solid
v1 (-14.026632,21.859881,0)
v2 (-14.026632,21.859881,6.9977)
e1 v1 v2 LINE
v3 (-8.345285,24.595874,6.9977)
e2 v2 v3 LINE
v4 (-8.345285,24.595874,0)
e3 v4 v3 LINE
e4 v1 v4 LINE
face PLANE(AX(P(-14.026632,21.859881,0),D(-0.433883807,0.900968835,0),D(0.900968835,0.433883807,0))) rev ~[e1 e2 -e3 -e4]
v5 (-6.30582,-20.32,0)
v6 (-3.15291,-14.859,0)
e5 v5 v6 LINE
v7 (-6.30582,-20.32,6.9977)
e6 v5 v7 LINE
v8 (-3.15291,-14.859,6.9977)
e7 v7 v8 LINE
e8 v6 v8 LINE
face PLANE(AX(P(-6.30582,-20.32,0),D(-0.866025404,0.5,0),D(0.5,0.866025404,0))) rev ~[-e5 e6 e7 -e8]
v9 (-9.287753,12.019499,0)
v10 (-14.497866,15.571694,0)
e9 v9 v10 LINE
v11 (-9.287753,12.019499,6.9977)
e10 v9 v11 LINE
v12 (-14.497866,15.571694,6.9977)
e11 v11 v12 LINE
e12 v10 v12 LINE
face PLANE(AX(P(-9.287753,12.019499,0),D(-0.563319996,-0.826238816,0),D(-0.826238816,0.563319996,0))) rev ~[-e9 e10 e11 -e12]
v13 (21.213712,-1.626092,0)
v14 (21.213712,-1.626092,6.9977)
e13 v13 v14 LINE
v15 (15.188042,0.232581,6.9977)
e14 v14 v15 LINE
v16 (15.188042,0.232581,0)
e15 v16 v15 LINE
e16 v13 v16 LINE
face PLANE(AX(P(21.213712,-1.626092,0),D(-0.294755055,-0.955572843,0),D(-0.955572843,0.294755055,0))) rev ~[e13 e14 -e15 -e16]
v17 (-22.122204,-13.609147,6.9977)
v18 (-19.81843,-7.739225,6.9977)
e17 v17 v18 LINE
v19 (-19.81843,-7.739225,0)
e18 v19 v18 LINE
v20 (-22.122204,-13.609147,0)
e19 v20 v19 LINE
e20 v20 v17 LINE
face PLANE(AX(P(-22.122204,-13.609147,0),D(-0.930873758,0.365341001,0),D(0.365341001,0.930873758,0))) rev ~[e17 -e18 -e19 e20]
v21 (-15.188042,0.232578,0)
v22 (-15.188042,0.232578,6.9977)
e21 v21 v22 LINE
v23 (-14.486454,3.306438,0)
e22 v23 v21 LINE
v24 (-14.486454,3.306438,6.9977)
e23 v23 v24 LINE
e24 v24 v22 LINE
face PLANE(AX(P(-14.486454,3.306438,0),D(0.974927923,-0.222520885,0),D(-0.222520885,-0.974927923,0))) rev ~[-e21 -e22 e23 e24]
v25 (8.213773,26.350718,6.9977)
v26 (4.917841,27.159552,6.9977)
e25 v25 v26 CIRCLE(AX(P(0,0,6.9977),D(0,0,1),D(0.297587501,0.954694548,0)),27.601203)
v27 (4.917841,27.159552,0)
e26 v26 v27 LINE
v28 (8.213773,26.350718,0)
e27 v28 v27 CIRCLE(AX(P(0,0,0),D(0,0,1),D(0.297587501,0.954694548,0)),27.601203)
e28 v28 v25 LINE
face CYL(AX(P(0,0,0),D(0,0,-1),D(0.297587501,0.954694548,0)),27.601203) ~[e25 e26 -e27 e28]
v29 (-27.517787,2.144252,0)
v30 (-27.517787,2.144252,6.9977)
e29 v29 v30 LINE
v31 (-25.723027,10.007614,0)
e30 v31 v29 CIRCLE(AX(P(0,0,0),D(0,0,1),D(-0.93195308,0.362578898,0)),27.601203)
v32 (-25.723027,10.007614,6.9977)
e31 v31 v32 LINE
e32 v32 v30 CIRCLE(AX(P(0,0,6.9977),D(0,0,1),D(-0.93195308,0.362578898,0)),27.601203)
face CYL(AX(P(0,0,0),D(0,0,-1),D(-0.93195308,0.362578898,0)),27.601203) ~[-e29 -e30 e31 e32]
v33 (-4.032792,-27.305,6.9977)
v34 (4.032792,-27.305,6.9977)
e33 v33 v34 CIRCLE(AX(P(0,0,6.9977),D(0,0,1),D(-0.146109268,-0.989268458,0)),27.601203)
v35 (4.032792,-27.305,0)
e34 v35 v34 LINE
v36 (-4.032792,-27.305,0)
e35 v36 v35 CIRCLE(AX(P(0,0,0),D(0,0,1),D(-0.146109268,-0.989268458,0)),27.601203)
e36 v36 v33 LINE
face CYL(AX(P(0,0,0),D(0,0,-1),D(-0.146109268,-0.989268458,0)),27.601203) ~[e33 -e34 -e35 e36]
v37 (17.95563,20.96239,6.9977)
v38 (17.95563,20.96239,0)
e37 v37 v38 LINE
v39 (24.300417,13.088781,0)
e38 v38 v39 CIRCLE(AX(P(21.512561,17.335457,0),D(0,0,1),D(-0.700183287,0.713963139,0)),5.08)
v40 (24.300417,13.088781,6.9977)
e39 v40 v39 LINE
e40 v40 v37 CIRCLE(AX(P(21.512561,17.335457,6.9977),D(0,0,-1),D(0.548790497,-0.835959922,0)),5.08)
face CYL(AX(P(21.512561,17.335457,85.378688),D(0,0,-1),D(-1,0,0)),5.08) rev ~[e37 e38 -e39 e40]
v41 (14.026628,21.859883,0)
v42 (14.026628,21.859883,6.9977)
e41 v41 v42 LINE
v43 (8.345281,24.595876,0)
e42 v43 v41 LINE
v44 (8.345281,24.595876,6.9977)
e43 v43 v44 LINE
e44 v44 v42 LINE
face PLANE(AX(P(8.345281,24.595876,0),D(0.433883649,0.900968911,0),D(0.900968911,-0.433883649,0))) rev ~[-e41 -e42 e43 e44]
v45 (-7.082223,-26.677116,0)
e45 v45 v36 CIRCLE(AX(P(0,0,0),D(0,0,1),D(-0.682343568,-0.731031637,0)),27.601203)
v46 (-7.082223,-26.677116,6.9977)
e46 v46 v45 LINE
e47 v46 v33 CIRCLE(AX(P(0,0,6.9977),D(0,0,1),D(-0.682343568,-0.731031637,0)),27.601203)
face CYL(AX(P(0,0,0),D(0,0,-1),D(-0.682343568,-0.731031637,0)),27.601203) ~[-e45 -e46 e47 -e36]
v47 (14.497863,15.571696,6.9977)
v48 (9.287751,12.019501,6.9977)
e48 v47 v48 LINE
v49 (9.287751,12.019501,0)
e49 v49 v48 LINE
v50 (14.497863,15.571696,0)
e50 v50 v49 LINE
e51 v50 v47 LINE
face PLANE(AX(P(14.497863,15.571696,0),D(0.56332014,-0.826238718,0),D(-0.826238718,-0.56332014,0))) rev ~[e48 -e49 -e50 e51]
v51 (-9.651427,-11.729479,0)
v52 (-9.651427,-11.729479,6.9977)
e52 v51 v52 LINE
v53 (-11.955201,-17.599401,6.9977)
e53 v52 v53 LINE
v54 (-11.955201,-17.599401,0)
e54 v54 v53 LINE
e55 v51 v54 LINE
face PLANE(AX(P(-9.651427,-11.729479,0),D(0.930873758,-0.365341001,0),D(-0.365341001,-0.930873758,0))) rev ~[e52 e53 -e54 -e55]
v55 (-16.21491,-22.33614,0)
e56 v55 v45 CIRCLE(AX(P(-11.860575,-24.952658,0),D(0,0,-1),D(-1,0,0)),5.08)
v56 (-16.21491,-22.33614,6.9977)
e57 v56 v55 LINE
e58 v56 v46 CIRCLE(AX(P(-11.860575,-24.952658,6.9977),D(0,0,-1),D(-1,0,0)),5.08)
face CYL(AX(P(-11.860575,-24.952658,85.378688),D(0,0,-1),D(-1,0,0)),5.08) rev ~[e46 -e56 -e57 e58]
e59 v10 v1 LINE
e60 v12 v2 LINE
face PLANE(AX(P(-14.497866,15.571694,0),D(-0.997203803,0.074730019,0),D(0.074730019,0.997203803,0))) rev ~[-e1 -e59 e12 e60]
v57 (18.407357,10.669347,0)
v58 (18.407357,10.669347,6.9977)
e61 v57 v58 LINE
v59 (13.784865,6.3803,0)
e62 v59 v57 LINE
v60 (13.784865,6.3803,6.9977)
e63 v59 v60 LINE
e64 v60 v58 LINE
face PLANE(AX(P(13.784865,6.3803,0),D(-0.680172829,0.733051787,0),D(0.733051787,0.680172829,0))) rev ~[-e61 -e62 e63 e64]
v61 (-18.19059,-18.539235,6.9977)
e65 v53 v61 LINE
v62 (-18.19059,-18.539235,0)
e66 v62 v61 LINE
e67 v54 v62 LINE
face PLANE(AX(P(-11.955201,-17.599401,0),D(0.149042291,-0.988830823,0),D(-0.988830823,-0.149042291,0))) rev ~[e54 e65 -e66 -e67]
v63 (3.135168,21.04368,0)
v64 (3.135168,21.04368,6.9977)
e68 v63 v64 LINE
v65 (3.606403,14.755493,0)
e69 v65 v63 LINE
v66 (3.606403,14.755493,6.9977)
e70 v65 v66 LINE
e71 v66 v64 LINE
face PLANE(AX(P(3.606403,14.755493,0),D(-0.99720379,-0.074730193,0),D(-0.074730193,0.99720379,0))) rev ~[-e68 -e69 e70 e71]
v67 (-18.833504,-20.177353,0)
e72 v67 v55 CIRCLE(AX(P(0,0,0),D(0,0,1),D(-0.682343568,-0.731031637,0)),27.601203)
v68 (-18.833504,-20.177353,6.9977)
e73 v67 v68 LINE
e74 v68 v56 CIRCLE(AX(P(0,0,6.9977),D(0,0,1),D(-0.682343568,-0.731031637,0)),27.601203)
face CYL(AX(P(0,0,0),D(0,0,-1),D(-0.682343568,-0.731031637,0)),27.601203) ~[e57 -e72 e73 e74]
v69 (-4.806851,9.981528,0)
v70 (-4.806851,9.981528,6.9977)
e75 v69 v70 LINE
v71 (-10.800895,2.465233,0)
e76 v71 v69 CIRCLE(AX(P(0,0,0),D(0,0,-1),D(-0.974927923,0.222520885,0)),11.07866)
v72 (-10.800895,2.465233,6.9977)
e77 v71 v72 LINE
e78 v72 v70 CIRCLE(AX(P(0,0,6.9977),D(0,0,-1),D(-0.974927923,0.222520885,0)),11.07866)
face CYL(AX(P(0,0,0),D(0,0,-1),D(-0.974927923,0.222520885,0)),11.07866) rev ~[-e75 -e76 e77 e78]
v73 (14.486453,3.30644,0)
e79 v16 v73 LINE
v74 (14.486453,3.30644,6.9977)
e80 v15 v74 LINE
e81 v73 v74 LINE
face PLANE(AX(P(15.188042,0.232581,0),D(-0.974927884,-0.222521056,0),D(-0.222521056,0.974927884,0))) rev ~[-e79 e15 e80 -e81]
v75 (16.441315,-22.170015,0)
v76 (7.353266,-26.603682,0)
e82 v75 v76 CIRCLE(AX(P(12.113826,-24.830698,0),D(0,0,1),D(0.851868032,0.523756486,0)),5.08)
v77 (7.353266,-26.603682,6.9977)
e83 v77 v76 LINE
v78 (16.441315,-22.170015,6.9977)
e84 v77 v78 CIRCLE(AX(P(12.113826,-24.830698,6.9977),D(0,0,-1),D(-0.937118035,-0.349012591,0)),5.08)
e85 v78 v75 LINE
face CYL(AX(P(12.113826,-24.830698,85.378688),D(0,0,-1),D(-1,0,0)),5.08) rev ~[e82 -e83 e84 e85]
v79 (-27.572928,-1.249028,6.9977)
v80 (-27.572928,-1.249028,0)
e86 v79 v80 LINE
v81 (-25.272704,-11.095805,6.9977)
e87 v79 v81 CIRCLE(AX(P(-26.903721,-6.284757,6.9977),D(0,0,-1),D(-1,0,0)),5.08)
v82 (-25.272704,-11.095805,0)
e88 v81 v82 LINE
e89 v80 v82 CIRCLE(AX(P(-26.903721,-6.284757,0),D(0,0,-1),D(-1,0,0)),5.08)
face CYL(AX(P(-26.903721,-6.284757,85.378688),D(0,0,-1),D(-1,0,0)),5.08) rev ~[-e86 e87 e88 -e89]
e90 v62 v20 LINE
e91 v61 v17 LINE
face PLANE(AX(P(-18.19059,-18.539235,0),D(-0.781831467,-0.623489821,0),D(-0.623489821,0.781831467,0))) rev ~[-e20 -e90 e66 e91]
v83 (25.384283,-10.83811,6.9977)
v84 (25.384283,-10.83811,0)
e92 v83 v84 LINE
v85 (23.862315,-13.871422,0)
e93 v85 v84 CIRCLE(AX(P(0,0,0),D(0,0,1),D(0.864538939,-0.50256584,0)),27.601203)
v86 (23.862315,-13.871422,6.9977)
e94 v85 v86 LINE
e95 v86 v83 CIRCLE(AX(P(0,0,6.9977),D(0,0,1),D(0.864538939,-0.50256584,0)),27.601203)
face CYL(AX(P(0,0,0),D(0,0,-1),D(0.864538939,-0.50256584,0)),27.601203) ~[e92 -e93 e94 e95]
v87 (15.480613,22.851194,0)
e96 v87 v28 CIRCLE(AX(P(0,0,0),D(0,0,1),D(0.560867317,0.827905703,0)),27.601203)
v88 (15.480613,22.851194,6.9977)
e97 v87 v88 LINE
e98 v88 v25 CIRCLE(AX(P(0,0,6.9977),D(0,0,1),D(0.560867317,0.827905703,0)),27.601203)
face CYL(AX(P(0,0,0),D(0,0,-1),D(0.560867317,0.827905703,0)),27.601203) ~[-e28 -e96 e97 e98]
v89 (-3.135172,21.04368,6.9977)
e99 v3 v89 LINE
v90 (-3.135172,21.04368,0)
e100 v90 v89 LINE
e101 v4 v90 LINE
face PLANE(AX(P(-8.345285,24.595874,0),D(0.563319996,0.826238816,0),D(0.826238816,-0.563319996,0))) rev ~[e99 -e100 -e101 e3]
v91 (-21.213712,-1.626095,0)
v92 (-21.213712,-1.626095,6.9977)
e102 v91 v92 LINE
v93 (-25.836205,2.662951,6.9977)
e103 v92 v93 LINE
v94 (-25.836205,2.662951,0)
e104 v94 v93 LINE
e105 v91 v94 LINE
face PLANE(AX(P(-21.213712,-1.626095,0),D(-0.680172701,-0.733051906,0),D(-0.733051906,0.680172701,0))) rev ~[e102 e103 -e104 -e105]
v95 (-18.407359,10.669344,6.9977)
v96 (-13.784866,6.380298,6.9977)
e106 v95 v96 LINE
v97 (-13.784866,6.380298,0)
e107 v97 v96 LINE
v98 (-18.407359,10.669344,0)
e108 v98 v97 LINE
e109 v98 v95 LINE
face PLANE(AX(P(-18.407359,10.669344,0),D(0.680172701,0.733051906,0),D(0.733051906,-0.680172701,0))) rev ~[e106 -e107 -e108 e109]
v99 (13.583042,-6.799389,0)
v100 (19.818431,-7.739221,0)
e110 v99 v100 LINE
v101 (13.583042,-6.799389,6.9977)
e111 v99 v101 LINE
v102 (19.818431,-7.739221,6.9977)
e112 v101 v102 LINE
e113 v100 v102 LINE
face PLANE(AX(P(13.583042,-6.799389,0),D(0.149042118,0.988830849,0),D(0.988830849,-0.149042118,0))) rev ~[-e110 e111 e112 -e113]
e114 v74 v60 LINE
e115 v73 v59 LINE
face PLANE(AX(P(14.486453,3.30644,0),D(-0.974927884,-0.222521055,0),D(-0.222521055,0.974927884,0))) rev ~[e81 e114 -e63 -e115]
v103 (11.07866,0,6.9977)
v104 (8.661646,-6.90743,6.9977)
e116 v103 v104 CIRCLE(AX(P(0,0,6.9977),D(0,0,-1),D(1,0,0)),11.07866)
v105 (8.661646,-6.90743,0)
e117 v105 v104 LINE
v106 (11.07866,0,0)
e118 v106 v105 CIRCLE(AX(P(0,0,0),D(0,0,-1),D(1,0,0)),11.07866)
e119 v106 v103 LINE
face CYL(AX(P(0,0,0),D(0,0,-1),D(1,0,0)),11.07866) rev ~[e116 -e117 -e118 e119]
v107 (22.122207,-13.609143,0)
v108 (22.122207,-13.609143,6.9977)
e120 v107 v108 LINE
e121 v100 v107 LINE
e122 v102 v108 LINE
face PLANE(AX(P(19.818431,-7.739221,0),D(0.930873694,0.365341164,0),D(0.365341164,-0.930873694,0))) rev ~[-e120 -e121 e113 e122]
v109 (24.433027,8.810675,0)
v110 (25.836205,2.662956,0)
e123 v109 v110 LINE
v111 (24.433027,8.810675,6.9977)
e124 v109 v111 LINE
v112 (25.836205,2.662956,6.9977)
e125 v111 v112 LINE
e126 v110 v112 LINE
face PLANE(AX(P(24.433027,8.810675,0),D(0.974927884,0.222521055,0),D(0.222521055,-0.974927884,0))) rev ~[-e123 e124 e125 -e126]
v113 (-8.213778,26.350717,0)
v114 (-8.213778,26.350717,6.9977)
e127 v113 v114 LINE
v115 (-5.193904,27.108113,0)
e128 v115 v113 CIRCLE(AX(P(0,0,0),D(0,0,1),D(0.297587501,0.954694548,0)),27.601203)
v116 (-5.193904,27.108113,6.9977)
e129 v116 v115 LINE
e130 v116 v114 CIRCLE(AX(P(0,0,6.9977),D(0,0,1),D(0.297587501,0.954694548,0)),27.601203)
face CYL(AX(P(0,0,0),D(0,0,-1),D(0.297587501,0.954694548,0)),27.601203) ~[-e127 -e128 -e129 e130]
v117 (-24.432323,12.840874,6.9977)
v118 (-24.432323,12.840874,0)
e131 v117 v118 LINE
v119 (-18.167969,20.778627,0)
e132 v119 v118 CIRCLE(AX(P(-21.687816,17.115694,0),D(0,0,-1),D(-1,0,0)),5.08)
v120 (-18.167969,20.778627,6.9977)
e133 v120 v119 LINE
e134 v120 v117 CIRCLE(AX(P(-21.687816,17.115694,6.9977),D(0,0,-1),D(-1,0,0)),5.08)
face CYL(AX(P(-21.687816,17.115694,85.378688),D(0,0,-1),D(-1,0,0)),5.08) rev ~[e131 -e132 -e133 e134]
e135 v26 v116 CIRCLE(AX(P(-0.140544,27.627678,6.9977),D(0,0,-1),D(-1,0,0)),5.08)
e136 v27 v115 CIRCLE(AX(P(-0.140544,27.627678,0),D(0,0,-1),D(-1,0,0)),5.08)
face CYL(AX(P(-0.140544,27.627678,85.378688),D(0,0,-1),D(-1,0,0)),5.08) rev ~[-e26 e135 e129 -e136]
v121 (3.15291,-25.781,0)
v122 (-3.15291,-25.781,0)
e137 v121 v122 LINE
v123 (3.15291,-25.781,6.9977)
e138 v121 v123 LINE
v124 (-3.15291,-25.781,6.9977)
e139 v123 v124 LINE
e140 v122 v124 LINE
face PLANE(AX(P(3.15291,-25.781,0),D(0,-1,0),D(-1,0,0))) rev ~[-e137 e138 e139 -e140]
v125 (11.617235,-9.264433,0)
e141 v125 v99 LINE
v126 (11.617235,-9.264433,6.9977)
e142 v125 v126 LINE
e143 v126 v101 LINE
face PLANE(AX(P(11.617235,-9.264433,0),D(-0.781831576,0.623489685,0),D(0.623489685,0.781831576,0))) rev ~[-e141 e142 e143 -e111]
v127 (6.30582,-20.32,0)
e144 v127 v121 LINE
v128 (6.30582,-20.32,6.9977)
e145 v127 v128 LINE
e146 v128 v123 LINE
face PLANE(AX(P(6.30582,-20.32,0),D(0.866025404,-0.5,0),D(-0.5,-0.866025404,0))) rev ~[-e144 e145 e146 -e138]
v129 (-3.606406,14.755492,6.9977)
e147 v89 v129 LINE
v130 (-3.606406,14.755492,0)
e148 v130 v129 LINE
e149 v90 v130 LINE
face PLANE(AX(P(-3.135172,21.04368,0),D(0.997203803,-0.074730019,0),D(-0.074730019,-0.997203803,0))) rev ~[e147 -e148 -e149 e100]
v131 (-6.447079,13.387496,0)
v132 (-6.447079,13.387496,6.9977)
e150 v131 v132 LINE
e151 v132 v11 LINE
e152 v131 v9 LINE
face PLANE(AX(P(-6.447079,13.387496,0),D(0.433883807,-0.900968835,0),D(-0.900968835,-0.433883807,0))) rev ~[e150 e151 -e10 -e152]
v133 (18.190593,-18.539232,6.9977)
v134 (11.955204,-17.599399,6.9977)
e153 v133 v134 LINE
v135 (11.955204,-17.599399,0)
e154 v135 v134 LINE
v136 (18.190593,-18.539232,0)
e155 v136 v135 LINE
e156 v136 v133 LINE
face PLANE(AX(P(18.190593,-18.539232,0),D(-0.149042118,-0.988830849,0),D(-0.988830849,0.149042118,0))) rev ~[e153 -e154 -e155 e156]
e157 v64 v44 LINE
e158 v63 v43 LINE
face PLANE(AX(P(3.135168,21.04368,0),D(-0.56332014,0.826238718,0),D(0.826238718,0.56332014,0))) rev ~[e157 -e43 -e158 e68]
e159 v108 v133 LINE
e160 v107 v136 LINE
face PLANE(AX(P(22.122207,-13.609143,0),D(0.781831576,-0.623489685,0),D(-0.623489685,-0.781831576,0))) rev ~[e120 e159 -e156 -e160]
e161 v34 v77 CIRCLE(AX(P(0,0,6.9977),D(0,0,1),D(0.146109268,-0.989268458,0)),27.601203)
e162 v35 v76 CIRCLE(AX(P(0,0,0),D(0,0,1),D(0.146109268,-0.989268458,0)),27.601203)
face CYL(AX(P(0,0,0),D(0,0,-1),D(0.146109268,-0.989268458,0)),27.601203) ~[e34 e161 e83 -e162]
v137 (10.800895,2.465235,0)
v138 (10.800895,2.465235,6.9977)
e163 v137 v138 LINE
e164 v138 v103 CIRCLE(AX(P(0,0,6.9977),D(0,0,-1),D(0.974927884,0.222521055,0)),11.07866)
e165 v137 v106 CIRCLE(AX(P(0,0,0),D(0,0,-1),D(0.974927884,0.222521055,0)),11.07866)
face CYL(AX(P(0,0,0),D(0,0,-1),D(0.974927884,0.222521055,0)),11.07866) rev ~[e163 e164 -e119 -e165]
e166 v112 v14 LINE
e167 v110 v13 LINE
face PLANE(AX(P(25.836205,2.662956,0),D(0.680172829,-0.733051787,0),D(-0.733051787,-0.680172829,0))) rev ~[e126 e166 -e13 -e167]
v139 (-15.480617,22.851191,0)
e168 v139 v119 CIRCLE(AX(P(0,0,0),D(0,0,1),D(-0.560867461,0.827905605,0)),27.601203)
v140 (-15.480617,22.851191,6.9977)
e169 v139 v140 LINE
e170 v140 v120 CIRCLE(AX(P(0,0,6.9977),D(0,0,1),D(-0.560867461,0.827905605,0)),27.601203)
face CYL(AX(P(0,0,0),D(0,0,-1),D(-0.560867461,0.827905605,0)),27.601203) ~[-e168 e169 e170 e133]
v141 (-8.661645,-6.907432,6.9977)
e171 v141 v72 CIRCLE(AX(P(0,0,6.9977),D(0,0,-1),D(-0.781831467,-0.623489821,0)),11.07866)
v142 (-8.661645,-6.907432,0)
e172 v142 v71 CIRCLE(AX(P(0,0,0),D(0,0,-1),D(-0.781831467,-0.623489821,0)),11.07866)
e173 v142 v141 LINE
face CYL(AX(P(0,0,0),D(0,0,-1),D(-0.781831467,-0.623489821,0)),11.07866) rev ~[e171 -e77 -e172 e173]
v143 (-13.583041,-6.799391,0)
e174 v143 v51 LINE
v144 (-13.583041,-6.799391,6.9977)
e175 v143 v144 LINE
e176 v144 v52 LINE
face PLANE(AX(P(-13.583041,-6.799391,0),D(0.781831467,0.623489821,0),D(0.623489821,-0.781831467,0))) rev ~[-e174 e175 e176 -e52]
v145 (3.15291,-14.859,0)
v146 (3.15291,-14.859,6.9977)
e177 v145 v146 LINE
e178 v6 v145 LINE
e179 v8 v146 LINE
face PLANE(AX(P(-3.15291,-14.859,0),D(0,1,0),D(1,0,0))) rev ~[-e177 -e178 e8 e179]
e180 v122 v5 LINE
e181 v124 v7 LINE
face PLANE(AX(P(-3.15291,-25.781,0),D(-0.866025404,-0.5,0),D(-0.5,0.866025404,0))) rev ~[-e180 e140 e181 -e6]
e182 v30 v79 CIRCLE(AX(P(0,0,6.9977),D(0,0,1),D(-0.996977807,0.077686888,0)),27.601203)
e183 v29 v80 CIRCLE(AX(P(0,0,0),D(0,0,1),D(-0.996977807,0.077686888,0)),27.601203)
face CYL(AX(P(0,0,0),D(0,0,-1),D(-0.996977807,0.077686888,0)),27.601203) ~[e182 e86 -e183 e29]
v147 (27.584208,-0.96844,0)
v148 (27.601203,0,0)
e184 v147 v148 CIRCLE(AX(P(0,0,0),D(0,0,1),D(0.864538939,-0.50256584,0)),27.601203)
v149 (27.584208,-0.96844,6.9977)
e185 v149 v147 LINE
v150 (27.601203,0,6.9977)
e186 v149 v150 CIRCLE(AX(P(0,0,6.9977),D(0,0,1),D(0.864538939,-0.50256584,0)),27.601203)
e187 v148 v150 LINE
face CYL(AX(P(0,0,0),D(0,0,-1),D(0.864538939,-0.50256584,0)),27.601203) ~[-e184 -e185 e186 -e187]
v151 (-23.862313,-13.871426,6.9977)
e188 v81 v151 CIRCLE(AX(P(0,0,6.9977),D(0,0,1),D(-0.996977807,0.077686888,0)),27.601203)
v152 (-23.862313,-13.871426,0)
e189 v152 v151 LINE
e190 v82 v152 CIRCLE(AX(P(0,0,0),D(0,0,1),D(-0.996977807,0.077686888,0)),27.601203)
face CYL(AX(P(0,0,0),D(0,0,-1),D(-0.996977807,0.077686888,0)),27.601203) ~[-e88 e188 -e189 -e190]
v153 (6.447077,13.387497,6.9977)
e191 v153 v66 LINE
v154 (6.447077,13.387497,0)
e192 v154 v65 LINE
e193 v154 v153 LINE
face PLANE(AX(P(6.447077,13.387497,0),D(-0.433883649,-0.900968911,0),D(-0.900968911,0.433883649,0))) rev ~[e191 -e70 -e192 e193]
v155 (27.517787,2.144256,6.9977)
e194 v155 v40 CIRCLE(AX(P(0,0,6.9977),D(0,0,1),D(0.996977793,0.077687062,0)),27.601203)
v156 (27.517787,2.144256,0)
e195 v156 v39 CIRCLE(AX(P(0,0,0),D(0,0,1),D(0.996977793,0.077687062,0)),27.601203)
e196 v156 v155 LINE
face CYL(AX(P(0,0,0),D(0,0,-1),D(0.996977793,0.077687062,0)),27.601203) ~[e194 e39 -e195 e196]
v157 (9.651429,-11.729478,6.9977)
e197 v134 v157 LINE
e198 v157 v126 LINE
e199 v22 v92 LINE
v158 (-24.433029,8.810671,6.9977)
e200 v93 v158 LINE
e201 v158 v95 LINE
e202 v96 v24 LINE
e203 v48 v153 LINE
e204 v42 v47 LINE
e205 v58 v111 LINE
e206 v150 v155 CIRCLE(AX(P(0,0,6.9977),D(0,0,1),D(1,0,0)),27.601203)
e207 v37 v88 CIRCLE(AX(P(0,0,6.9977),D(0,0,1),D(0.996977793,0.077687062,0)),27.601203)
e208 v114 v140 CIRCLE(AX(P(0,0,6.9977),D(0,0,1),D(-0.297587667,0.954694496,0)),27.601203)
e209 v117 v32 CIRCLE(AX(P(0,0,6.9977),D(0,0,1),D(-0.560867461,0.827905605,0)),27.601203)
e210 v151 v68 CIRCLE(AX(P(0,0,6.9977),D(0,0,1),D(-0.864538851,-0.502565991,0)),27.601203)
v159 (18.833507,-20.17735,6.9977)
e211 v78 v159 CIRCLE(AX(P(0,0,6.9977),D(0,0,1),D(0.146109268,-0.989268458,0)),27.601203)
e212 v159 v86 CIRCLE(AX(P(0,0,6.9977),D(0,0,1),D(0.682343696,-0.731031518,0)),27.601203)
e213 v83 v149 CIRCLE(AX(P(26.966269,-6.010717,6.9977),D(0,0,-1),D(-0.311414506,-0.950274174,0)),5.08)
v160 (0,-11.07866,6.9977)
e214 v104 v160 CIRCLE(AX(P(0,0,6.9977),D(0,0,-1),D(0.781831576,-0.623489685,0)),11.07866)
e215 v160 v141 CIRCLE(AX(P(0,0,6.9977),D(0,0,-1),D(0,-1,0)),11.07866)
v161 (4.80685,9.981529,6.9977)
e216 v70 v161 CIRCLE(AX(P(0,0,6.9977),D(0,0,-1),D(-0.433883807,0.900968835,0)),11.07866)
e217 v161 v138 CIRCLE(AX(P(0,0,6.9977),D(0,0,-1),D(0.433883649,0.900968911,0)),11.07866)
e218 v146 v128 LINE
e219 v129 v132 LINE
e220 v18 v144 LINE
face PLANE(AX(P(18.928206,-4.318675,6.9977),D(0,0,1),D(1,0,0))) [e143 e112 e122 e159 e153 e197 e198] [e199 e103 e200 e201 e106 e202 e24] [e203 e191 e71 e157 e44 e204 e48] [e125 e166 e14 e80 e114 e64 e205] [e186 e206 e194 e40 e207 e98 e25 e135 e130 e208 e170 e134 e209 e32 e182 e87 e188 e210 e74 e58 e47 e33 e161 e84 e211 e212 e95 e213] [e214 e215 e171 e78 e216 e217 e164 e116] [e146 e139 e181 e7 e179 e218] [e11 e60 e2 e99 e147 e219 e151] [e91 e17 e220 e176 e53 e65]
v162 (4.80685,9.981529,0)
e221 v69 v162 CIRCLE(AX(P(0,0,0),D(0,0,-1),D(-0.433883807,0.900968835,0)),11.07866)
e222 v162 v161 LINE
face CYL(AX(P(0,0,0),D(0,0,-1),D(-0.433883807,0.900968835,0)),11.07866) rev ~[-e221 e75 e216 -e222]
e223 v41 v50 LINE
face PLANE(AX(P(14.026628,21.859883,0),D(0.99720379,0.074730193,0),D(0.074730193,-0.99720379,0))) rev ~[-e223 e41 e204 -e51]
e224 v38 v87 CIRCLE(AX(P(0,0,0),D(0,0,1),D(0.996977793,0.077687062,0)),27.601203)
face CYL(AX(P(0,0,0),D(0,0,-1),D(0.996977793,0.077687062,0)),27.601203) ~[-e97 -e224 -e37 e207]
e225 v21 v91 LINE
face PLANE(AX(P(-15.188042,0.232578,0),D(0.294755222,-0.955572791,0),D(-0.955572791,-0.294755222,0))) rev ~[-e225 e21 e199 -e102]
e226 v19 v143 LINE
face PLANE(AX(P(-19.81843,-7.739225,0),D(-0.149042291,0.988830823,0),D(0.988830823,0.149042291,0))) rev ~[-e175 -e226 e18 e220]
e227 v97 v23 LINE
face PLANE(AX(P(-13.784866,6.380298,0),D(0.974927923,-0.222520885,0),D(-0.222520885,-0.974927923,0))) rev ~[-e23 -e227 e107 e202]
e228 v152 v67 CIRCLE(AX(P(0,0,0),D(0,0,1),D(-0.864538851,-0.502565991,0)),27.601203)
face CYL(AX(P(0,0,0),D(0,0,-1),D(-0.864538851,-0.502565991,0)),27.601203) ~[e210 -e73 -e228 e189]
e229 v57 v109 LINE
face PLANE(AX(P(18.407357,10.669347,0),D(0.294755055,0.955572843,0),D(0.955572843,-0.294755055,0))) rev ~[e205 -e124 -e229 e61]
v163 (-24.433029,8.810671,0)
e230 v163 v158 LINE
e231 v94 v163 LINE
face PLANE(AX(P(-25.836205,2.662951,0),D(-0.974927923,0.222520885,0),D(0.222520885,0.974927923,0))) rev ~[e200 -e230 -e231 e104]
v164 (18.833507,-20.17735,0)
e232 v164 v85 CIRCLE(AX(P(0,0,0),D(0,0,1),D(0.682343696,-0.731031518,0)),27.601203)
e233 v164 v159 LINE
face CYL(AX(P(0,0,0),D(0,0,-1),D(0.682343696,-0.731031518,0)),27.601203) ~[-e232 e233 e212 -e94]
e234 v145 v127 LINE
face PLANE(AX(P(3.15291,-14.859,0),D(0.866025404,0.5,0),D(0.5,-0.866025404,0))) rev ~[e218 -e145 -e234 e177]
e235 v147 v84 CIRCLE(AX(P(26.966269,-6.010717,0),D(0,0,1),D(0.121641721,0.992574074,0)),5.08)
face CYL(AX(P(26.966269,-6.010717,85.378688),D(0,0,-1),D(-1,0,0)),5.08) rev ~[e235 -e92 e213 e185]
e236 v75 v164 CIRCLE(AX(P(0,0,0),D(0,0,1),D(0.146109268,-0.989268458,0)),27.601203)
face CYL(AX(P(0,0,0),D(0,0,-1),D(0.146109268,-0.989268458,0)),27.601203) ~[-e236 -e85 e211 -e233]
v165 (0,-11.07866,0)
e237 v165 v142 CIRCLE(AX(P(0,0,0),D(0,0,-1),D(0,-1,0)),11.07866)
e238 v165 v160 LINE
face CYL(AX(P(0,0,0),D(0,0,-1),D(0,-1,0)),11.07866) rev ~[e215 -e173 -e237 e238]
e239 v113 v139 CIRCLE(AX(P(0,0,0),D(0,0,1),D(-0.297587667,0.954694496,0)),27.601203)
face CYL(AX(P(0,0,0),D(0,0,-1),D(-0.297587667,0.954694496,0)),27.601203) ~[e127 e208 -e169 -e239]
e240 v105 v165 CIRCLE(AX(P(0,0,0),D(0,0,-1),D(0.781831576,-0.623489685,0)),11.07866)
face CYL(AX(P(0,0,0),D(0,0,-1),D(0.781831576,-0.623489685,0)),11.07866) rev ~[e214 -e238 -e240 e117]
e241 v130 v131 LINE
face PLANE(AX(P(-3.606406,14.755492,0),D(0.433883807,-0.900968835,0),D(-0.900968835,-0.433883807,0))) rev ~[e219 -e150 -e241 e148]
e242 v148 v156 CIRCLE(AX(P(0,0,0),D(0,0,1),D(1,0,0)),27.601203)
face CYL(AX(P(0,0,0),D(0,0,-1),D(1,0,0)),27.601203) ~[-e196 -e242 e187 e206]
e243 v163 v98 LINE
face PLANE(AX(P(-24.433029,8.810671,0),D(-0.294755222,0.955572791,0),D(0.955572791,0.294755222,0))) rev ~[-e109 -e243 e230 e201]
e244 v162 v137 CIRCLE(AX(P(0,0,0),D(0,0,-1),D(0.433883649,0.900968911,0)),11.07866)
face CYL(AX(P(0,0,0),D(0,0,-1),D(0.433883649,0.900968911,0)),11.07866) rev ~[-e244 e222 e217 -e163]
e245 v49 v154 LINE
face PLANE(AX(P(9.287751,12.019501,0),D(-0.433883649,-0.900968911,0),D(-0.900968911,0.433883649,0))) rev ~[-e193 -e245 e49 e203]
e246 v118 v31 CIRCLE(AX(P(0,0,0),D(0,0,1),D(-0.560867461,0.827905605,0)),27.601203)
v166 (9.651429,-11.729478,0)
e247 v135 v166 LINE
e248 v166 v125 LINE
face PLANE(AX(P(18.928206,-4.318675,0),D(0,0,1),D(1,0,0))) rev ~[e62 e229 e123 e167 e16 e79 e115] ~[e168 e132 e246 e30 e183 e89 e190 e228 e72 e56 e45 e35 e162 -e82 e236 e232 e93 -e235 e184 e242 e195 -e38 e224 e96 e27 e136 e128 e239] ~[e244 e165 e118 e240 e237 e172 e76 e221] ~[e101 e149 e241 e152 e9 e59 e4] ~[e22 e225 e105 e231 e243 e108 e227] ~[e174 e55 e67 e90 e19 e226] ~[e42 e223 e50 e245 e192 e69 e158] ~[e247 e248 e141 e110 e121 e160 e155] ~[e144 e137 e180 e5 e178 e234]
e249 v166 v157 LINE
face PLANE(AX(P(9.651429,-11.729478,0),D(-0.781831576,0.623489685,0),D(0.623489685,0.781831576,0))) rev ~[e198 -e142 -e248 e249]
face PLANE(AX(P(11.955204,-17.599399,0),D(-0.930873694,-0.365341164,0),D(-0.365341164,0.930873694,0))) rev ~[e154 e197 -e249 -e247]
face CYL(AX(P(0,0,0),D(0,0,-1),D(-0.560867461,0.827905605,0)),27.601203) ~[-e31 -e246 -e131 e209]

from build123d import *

# Parameters (mm, degrees)
F1_DEPTH = 6.9977
F4_D     = 10.16


# Not quite as in the source:
# - a feature names something its author has since deleted; it is built from what else it names


with BuildPart() as f1:
    # F0 (on Top) → F1 (new body)
    with BuildSketch(Plane.XY):
        with BuildLine():
            Line((13.000663339, 2.9673182751), (10.80089488, 2.4652351906))
            ThreePointArc((10.80089488, 2.4652351906), (11.0089999639, 1.2404170862), (11.0786603321, 0))
            ThreePointArc((11.0786603321, 0), (10.4569630833, -3.65904876), (8.6616464645, -6.9074304395))
            Line((8.6616464645, -6.9074304395), (10.4257240625, -8.3142349481))
            Line((10.4257240625, -8.3142349481), (12.9401280453, -5.1612711132))
            Line((12.9401280453, -5.1612711132), (20.9156255847, -6.3633827272))
            Line((20.9156255847, -6.3633827272), (23.8623151585, -13.8714220112))
            ThreePointArc((23.8623151585, -13.8714220112), (26.6500942722, -7.1832380314), (27.6012034762, 0))
            ThreePointArc((27.6012034762, 0), (27.5803414567, 1.0729391714), (27.5177869348, 2.1442564078))
            Line((27.5177869348, 2.1442564078), (21.6052967122, -3.3417341773))
            Line((21.6052967122, -3.3417341773), (13.8980443892, -0.9643627375))
            Line((13.8980443892, -0.9643627375), (13.000663339, 2.9673182751))
        make_face()
        with BuildLine():
            ThreePointArc((4.8068495738, 9.9815285367), (8.6616446562, 6.9074327071), (10.80089488, 2.4652351906))
            Line((10.80089488, 2.4652351906), (13.000663339, 2.9673182751))
            Line((13.000663339, 2.9673182751), (12.1032822888, 6.8989992876))
            Line((12.1032822888, 6.8989992876), (18.0157725115, 12.3849898727))
            Line((18.0157725115, 12.3849898727), (25.7230248345, 10.0076184329))
            ThreePointArc((25.7230248345, 10.0076184329), (21.5794879008, 17.2090713076), (15.4806129272, 22.8511937704))
            Line((15.4806129272, 22.8511937704), (16.0833555213, 14.8081635766))
            Line((16.0833555213, 14.8081635766), (9.419258347, 10.2646580813))
            Line((9.419258347, 10.2646580813), (5.7858384629, 12.0144204305))
            Line((5.7858384629, 12.0144204305), (4.8068495738, 9.9815285367))
        make_face()
        with BuildLine():
            Line((10.4257240625, -8.3142349481), (8.6616464645, -6.9074304395))
            ThreePointArc((8.6616464645, -6.9074304395), (4.8068513159, -9.9815276977), (0, -11.0786603321))
            Line((0, -11.0786603321), (0, -12.7))
            Line((0, -12.7), (0, -13.335))
            Line((0, -13.335), (4.0327916303, -13.335))
            Line((4.0327916303, -13.335), (8.0655832606, -20.32))
            Line((8.0655832606, -20.32), (4.0327916303, -27.305))
            ThreePointArc((4.0327916303, -27.305), (11.9757152285, -24.8678241529), (18.8335071928, -20.1773496811))
            Line((18.8335071928, -20.1773496811), (10.8580096534, -18.975238067))
            Line((10.8580096534, -18.975238067), (7.9113200797, -11.467198783))
            Line((7.9113200797, -11.467198783), (10.4257240625, -8.3142349481))
        make_face()
        with BuildLine():
            ThreePointArc((-4.8068513159, 9.9815276977), (-9.668e-07, 11.0786603321), (4.8068495738, 9.9815285367))
            Line((4.8068495738, 9.9815285367), (5.7858384629, 12.0144204305))
            Line((5.7858384629, 12.0144204305), (2.1524185788, 13.7641827798))
            Line((2.1524185788, 13.7641827798), (1.5496759847, 21.8072129736))
            Line((1.5496759847, 21.8072129736), (8.2137731589, 26.3507184689))
            ThreePointArc((8.2137731589, 26.3507184689), (-2.4087e-06, 27.6012034762), (-8.213777758, 26.3507170353))
            Line((-8.213777758, 26.3507170353), (-1.5496797908, 21.8072127031))
            Line((-1.5496797908, 21.8072127031), (-2.1524209811, 13.7641824041))
            Line((-2.1524209811, 13.7641824041), (-5.7858405598, 12.0144194207))
            Line((-5.7858405598, 12.0144194207), (-4.8068513159, 9.9815276977))
        make_face()
        Polygon((12.1032822888, 6.8989992876), (13.000663339, 2.9673182751), (13.8980443892, -0.9643627375), (21.6052967122, -3.3417341773), (27.5177869348, 2.1442564078), (25.7230248345, 10.0076184329), (18.0157725115, 12.3849898727), align=None)
        Polygon((15.188042256, 0.2325806629), (14.4864534349, 3.3064403636), (13.7848646139, 6.3803000643), (18.4073569698, 10.6693472491), (24.4330269677, 8.8106750325), (25.8362046098, 2.6629556311), (21.2137122539, -1.6260915537), align=None, mode=Mode.SUBTRACT)
        with BuildLine():
            Line((0, -12.7), (0, -11.0786603321))
            ThreePointArc((0, -11.0786603321), (-4.8068504449, -9.9815281172), (-8.661645259, -6.9074319513))
            Line((-8.661645259, -6.9074319513), (-10.4257226114, -8.3142367677))
            Line((-10.4257226114, -8.3142367677), (-7.9113180783, -11.4672001638))
            Line((-7.9113180783, -11.4672001638), (-10.8580063416, -18.9752399621))
            Line((-10.8580063416, -18.9752399621), (-18.8335036712, -20.1773529681))
            ThreePointArc((-18.8335036712, -20.1773529681), (-11.9757130584, -24.867825198), (-4.0327916303, -27.305))
            Line((-4.0327916303, -27.305), (-8.0655832606, -20.32))
            Line((-8.0655832606, -20.32), (-4.0327916303, -13.335))
            Line((-4.0327916303, -13.335), (0, -13.335))
            Line((0, -13.335), (0, -12.7))
        make_face()
        Polygon((12.9401280453, -5.1612711132), (10.4257240625, -8.3142349481), (7.9113200797, -11.467198783), (10.8580096534, -18.975238067), (18.8335071928, -20.1773496811), (23.8623151585, -13.8714220112), (20.9156255847, -6.3633827272), align=None)
        Polygon((9.6514286337, -11.7294776807), (11.6172353839, -9.2644332279), (13.5830421342, -6.7993887751), (19.8184311195, -7.7392214916), (22.1222066044, -13.6091431136), (18.190593104, -18.5392320191), (11.9552041187, -17.5993993027), align=None, mode=Mode.SUBTRACT)
        with BuildLine():
            ThreePointArc((-10.8008953103, 2.4652333055), (-8.6616458618, 6.9074311954), (-4.8068513159, 9.9815276977))
            Line((-4.8068513159, 9.9815276977), (-5.7858405598, 12.0144194207))
            Line((-5.7858405598, 12.0144194207), (-9.4192601386, 10.2646564373))
            Line((-9.4192601386, 10.2646564373), (-16.0833581058, 14.8081607695))
            Line((-16.0833581058, 14.8081607695), (-15.4806169155, 22.8511910685))
            ThreePointArc((-15.4806169155, 22.8511910685), (-21.5794909044, 17.2090675413), (-25.7230265811, 10.0076139433))
            Line((-25.7230265811, 10.0076139433), (-18.0157746731, 12.3849867284))
            Line((-18.0157746731, 12.3849867284), (-12.103283493, 6.8989971751))
            Line((-12.103283493, 6.8989971751), (-13.0006638569, 2.967316006))
            Line((-13.0006638569, 2.967316006), (-10.8008953103, 2.4652333055))
        make_face()
        Polygon((2.1524185788, 13.7641827798), (5.7858384629, 12.0144204305), (9.419258347, 10.2646580813), (16.0833555213, 14.8081635766), (15.4806129272, 22.8511937704), (8.2137731589, 26.3507184689), (1.5496759847, 21.8072129736), align=None)
        Polygon((9.287750872, 12.0195010326), (6.4470771444, 13.3874970511), (3.6064034168, 14.7554930697), (3.1351682978, 21.0436803121), (8.345280634, 24.5958755175), (14.0266280892, 21.8598834805), (14.4978632082, 15.5716962381), align=None, mode=Mode.SUBTRACT)
        with BuildLine():
            Line((-10.4257226114, -8.3142367677), (-8.661645259, -6.9074319513))
            ThreePointArc((-8.661645259, -6.9074319513), (-10.8008950951, -2.465234248), (-10.8008953103, 2.4652333055))
            Line((-10.8008953103, 2.4652333055), (-13.0006638569, 2.967316006))
            Line((-13.0006638569, 2.967316006), (-13.8980442209, -0.9643651631))
            Line((-13.8980442209, -0.9643651631), (-21.6052961289, -3.3417379482))
            Line((-21.6052961289, -3.3417379482), (-27.5177873091, 2.1442516051))
            ThreePointArc((-27.5177873091, 2.1442516051), (-26.909183449, -6.1418465822), (-23.8623127374, -13.8714261759))
            Line((-23.8623127374, -13.8714261759), (-20.9156244741, -6.3633863777))
            Line((-20.9156244741, -6.3633863777), (-12.9401271445, -5.1612733716))
            Line((-12.9401271445, -5.1612733716), (-10.4257226114, -8.3142367677))
        make_face()
        Polygon((-11.0835964967, -4.9326477372), (-9.8135964967, -7.1323522628), (-10.3635226281, -7.4498522628), (-11.6335226281, -5.2501477372), align=None, mode=Mode.SUBTRACT)
        Polygon((-9.4192601386, 10.2646564373), (-5.7858405598, 12.0144194207), (-2.1524209811, 13.7641824041), (-1.5496797908, 21.8072127031), (-8.213777758, 26.3507170353), (-15.4806169155, 22.8511910685), (-16.0833581058, 14.8081607695), align=None)
        Polygon((-3.6064059921, 14.7554924402), (-6.4470794809, 13.3874959259), (-9.2877529698, 12.0194994116), (-14.497865926, 15.5716937077), (-14.0266319045, 21.8598810324), (-8.3452849268, 24.595874061), (-3.1351719706, 21.0436797649), align=None, mode=Mode.SUBTRACT)
        Polygon((-7.9113180783, -11.4672001638), (-10.4257226114, -8.3142367677), (-12.9401271445, -5.1612733716), (-20.9156244741, -6.3633863777), (-23.8623127374, -13.8714261759), (-18.8335036712, -20.1773529681), (-10.8580063416, -18.9752399621), align=None)
        Polygon((-13.5830409474, -6.7993911458), (-11.617233767, -9.2644352555), (-9.6514265866, -11.7294793652), (-11.955201047, -17.5994013892), (-18.1905898683, -18.539235194), (-22.1222042292, -13.6091469746), (-19.8184297687, -7.7392249505), align=None, mode=Mode.SUBTRACT)
        Polygon((-13.8980442209, -0.9643651631), (-13.0006638569, 2.967316006), (-12.103283493, 6.8989971751), (-18.0157746731, 12.3849867284), (-25.7230265811, 10.0076139433), (-27.5177873091, 2.1442516051), (-21.6052961289, -3.3417379482), align=None)
        Polygon((-13.7848657274, 6.3802976584), (-14.486454012, 3.3064378353), (-15.1880422965, 0.2325780121), (-21.2137119701, -1.6260952562), (-25.8362050746, 2.6629511218), (-24.4330285055, 8.8106707681), (-18.4073588319, 10.6693440364), align=None, mode=Mode.SUBTRACT)
        Polygon((4.0327916303, -13.335), (0, -13.335), (-4.0327916303, -13.335), (-8.0655832606, -20.32), (-4.0327916303, -27.305), (4.0327916303, -27.305), (8.0655832606, -20.32), align=None)
        Polygon((-3.15290982, -14.859), (0, -14.859), (3.15290982, -14.859), (6.3058196401, -20.32), (3.15290982, -25.781), (-3.15290982, -25.781), (-6.3058196401, -20.32), align=None, mode=Mode.SUBTRACT)
        with BuildLine():
            Line((25.7230248345, 10.0076184329), (27.5177869348, 2.1442564078))
            ThreePointArc((27.5177869348, 2.1442564078), (26.9091829131, 6.1418489305), (25.7230248345, 10.0076184329))
        make_face()
        with BuildLine():
            Line((23.8623151585, -13.8714220112), (18.8335071928, -20.1773496811))
            ThreePointArc((18.8335071928, -20.1773496811), (21.5794924062, -17.2090656581), (23.8623151585, -13.8714220112))
        make_face()
        with BuildLine():
            Line((8.2137731589, 26.3507184689), (15.4806129272, 22.8511937704))
            ThreePointArc((15.4806129272, 22.8511937704), (11.9757108882, 24.8678262431), (8.2137731589, 26.3507184689))
        make_face()
        with BuildLine():
            ThreePointArc((-4.0327916303, -27.305), (0, -27.6012034762), (4.0327916303, -27.305))
            Line((4.0327916303, -27.305), (-4.0327916303, -27.305))
        make_face()
        with BuildLine():
            Line((-15.4806169155, 22.8511910685), (-8.213777758, 26.3507170353))
            ThreePointArc((-8.213777758, 26.3507170353), (-11.9757152285, 24.8678241529), (-15.4806169155, 22.8511910685))
        make_face()
        with BuildLine():
            Line((-18.8335036712, -20.1773529681), (-23.8623127374, -13.8714261759))
            ThreePointArc((-23.8623127374, -13.8714261759), (-21.5794894026, -17.2090694245), (-18.8335036712, -20.1773529681))
        make_face()
        with BuildLine():
            Line((-27.5177873091, 2.1442516051), (-25.7230265811, 10.0076139433))
            ThreePointArc((-25.7230265811, 10.0076139433), (-26.909183985, 6.141844234), (-27.5177873091, 2.1442516051))
        make_face()
        Polygon((-10.3635226281, -7.4498522628), (-9.8135964967, -7.1323522628), (-11.0835964967, -4.9326477372), (-11.6335226281, -5.2501477372), align=None)
    extrude(amount=F1_DEPTH)

    # F4 (through all)
    with Locations(Plane.XY.offset(6.9977)):
        with Locations((-21.6878161621, 17.115694081), (-0.1405437248, 27.6276781728), (21.5125610038, 17.3354570985), (26.9662685203, -6.0107167498), (12.1138258294, -24.8306982893), (-11.8605747881, -24.952657563), (-26.9037206785, -6.2847567503)):
            Hole(F4_D / 2)


solid = f1.part
